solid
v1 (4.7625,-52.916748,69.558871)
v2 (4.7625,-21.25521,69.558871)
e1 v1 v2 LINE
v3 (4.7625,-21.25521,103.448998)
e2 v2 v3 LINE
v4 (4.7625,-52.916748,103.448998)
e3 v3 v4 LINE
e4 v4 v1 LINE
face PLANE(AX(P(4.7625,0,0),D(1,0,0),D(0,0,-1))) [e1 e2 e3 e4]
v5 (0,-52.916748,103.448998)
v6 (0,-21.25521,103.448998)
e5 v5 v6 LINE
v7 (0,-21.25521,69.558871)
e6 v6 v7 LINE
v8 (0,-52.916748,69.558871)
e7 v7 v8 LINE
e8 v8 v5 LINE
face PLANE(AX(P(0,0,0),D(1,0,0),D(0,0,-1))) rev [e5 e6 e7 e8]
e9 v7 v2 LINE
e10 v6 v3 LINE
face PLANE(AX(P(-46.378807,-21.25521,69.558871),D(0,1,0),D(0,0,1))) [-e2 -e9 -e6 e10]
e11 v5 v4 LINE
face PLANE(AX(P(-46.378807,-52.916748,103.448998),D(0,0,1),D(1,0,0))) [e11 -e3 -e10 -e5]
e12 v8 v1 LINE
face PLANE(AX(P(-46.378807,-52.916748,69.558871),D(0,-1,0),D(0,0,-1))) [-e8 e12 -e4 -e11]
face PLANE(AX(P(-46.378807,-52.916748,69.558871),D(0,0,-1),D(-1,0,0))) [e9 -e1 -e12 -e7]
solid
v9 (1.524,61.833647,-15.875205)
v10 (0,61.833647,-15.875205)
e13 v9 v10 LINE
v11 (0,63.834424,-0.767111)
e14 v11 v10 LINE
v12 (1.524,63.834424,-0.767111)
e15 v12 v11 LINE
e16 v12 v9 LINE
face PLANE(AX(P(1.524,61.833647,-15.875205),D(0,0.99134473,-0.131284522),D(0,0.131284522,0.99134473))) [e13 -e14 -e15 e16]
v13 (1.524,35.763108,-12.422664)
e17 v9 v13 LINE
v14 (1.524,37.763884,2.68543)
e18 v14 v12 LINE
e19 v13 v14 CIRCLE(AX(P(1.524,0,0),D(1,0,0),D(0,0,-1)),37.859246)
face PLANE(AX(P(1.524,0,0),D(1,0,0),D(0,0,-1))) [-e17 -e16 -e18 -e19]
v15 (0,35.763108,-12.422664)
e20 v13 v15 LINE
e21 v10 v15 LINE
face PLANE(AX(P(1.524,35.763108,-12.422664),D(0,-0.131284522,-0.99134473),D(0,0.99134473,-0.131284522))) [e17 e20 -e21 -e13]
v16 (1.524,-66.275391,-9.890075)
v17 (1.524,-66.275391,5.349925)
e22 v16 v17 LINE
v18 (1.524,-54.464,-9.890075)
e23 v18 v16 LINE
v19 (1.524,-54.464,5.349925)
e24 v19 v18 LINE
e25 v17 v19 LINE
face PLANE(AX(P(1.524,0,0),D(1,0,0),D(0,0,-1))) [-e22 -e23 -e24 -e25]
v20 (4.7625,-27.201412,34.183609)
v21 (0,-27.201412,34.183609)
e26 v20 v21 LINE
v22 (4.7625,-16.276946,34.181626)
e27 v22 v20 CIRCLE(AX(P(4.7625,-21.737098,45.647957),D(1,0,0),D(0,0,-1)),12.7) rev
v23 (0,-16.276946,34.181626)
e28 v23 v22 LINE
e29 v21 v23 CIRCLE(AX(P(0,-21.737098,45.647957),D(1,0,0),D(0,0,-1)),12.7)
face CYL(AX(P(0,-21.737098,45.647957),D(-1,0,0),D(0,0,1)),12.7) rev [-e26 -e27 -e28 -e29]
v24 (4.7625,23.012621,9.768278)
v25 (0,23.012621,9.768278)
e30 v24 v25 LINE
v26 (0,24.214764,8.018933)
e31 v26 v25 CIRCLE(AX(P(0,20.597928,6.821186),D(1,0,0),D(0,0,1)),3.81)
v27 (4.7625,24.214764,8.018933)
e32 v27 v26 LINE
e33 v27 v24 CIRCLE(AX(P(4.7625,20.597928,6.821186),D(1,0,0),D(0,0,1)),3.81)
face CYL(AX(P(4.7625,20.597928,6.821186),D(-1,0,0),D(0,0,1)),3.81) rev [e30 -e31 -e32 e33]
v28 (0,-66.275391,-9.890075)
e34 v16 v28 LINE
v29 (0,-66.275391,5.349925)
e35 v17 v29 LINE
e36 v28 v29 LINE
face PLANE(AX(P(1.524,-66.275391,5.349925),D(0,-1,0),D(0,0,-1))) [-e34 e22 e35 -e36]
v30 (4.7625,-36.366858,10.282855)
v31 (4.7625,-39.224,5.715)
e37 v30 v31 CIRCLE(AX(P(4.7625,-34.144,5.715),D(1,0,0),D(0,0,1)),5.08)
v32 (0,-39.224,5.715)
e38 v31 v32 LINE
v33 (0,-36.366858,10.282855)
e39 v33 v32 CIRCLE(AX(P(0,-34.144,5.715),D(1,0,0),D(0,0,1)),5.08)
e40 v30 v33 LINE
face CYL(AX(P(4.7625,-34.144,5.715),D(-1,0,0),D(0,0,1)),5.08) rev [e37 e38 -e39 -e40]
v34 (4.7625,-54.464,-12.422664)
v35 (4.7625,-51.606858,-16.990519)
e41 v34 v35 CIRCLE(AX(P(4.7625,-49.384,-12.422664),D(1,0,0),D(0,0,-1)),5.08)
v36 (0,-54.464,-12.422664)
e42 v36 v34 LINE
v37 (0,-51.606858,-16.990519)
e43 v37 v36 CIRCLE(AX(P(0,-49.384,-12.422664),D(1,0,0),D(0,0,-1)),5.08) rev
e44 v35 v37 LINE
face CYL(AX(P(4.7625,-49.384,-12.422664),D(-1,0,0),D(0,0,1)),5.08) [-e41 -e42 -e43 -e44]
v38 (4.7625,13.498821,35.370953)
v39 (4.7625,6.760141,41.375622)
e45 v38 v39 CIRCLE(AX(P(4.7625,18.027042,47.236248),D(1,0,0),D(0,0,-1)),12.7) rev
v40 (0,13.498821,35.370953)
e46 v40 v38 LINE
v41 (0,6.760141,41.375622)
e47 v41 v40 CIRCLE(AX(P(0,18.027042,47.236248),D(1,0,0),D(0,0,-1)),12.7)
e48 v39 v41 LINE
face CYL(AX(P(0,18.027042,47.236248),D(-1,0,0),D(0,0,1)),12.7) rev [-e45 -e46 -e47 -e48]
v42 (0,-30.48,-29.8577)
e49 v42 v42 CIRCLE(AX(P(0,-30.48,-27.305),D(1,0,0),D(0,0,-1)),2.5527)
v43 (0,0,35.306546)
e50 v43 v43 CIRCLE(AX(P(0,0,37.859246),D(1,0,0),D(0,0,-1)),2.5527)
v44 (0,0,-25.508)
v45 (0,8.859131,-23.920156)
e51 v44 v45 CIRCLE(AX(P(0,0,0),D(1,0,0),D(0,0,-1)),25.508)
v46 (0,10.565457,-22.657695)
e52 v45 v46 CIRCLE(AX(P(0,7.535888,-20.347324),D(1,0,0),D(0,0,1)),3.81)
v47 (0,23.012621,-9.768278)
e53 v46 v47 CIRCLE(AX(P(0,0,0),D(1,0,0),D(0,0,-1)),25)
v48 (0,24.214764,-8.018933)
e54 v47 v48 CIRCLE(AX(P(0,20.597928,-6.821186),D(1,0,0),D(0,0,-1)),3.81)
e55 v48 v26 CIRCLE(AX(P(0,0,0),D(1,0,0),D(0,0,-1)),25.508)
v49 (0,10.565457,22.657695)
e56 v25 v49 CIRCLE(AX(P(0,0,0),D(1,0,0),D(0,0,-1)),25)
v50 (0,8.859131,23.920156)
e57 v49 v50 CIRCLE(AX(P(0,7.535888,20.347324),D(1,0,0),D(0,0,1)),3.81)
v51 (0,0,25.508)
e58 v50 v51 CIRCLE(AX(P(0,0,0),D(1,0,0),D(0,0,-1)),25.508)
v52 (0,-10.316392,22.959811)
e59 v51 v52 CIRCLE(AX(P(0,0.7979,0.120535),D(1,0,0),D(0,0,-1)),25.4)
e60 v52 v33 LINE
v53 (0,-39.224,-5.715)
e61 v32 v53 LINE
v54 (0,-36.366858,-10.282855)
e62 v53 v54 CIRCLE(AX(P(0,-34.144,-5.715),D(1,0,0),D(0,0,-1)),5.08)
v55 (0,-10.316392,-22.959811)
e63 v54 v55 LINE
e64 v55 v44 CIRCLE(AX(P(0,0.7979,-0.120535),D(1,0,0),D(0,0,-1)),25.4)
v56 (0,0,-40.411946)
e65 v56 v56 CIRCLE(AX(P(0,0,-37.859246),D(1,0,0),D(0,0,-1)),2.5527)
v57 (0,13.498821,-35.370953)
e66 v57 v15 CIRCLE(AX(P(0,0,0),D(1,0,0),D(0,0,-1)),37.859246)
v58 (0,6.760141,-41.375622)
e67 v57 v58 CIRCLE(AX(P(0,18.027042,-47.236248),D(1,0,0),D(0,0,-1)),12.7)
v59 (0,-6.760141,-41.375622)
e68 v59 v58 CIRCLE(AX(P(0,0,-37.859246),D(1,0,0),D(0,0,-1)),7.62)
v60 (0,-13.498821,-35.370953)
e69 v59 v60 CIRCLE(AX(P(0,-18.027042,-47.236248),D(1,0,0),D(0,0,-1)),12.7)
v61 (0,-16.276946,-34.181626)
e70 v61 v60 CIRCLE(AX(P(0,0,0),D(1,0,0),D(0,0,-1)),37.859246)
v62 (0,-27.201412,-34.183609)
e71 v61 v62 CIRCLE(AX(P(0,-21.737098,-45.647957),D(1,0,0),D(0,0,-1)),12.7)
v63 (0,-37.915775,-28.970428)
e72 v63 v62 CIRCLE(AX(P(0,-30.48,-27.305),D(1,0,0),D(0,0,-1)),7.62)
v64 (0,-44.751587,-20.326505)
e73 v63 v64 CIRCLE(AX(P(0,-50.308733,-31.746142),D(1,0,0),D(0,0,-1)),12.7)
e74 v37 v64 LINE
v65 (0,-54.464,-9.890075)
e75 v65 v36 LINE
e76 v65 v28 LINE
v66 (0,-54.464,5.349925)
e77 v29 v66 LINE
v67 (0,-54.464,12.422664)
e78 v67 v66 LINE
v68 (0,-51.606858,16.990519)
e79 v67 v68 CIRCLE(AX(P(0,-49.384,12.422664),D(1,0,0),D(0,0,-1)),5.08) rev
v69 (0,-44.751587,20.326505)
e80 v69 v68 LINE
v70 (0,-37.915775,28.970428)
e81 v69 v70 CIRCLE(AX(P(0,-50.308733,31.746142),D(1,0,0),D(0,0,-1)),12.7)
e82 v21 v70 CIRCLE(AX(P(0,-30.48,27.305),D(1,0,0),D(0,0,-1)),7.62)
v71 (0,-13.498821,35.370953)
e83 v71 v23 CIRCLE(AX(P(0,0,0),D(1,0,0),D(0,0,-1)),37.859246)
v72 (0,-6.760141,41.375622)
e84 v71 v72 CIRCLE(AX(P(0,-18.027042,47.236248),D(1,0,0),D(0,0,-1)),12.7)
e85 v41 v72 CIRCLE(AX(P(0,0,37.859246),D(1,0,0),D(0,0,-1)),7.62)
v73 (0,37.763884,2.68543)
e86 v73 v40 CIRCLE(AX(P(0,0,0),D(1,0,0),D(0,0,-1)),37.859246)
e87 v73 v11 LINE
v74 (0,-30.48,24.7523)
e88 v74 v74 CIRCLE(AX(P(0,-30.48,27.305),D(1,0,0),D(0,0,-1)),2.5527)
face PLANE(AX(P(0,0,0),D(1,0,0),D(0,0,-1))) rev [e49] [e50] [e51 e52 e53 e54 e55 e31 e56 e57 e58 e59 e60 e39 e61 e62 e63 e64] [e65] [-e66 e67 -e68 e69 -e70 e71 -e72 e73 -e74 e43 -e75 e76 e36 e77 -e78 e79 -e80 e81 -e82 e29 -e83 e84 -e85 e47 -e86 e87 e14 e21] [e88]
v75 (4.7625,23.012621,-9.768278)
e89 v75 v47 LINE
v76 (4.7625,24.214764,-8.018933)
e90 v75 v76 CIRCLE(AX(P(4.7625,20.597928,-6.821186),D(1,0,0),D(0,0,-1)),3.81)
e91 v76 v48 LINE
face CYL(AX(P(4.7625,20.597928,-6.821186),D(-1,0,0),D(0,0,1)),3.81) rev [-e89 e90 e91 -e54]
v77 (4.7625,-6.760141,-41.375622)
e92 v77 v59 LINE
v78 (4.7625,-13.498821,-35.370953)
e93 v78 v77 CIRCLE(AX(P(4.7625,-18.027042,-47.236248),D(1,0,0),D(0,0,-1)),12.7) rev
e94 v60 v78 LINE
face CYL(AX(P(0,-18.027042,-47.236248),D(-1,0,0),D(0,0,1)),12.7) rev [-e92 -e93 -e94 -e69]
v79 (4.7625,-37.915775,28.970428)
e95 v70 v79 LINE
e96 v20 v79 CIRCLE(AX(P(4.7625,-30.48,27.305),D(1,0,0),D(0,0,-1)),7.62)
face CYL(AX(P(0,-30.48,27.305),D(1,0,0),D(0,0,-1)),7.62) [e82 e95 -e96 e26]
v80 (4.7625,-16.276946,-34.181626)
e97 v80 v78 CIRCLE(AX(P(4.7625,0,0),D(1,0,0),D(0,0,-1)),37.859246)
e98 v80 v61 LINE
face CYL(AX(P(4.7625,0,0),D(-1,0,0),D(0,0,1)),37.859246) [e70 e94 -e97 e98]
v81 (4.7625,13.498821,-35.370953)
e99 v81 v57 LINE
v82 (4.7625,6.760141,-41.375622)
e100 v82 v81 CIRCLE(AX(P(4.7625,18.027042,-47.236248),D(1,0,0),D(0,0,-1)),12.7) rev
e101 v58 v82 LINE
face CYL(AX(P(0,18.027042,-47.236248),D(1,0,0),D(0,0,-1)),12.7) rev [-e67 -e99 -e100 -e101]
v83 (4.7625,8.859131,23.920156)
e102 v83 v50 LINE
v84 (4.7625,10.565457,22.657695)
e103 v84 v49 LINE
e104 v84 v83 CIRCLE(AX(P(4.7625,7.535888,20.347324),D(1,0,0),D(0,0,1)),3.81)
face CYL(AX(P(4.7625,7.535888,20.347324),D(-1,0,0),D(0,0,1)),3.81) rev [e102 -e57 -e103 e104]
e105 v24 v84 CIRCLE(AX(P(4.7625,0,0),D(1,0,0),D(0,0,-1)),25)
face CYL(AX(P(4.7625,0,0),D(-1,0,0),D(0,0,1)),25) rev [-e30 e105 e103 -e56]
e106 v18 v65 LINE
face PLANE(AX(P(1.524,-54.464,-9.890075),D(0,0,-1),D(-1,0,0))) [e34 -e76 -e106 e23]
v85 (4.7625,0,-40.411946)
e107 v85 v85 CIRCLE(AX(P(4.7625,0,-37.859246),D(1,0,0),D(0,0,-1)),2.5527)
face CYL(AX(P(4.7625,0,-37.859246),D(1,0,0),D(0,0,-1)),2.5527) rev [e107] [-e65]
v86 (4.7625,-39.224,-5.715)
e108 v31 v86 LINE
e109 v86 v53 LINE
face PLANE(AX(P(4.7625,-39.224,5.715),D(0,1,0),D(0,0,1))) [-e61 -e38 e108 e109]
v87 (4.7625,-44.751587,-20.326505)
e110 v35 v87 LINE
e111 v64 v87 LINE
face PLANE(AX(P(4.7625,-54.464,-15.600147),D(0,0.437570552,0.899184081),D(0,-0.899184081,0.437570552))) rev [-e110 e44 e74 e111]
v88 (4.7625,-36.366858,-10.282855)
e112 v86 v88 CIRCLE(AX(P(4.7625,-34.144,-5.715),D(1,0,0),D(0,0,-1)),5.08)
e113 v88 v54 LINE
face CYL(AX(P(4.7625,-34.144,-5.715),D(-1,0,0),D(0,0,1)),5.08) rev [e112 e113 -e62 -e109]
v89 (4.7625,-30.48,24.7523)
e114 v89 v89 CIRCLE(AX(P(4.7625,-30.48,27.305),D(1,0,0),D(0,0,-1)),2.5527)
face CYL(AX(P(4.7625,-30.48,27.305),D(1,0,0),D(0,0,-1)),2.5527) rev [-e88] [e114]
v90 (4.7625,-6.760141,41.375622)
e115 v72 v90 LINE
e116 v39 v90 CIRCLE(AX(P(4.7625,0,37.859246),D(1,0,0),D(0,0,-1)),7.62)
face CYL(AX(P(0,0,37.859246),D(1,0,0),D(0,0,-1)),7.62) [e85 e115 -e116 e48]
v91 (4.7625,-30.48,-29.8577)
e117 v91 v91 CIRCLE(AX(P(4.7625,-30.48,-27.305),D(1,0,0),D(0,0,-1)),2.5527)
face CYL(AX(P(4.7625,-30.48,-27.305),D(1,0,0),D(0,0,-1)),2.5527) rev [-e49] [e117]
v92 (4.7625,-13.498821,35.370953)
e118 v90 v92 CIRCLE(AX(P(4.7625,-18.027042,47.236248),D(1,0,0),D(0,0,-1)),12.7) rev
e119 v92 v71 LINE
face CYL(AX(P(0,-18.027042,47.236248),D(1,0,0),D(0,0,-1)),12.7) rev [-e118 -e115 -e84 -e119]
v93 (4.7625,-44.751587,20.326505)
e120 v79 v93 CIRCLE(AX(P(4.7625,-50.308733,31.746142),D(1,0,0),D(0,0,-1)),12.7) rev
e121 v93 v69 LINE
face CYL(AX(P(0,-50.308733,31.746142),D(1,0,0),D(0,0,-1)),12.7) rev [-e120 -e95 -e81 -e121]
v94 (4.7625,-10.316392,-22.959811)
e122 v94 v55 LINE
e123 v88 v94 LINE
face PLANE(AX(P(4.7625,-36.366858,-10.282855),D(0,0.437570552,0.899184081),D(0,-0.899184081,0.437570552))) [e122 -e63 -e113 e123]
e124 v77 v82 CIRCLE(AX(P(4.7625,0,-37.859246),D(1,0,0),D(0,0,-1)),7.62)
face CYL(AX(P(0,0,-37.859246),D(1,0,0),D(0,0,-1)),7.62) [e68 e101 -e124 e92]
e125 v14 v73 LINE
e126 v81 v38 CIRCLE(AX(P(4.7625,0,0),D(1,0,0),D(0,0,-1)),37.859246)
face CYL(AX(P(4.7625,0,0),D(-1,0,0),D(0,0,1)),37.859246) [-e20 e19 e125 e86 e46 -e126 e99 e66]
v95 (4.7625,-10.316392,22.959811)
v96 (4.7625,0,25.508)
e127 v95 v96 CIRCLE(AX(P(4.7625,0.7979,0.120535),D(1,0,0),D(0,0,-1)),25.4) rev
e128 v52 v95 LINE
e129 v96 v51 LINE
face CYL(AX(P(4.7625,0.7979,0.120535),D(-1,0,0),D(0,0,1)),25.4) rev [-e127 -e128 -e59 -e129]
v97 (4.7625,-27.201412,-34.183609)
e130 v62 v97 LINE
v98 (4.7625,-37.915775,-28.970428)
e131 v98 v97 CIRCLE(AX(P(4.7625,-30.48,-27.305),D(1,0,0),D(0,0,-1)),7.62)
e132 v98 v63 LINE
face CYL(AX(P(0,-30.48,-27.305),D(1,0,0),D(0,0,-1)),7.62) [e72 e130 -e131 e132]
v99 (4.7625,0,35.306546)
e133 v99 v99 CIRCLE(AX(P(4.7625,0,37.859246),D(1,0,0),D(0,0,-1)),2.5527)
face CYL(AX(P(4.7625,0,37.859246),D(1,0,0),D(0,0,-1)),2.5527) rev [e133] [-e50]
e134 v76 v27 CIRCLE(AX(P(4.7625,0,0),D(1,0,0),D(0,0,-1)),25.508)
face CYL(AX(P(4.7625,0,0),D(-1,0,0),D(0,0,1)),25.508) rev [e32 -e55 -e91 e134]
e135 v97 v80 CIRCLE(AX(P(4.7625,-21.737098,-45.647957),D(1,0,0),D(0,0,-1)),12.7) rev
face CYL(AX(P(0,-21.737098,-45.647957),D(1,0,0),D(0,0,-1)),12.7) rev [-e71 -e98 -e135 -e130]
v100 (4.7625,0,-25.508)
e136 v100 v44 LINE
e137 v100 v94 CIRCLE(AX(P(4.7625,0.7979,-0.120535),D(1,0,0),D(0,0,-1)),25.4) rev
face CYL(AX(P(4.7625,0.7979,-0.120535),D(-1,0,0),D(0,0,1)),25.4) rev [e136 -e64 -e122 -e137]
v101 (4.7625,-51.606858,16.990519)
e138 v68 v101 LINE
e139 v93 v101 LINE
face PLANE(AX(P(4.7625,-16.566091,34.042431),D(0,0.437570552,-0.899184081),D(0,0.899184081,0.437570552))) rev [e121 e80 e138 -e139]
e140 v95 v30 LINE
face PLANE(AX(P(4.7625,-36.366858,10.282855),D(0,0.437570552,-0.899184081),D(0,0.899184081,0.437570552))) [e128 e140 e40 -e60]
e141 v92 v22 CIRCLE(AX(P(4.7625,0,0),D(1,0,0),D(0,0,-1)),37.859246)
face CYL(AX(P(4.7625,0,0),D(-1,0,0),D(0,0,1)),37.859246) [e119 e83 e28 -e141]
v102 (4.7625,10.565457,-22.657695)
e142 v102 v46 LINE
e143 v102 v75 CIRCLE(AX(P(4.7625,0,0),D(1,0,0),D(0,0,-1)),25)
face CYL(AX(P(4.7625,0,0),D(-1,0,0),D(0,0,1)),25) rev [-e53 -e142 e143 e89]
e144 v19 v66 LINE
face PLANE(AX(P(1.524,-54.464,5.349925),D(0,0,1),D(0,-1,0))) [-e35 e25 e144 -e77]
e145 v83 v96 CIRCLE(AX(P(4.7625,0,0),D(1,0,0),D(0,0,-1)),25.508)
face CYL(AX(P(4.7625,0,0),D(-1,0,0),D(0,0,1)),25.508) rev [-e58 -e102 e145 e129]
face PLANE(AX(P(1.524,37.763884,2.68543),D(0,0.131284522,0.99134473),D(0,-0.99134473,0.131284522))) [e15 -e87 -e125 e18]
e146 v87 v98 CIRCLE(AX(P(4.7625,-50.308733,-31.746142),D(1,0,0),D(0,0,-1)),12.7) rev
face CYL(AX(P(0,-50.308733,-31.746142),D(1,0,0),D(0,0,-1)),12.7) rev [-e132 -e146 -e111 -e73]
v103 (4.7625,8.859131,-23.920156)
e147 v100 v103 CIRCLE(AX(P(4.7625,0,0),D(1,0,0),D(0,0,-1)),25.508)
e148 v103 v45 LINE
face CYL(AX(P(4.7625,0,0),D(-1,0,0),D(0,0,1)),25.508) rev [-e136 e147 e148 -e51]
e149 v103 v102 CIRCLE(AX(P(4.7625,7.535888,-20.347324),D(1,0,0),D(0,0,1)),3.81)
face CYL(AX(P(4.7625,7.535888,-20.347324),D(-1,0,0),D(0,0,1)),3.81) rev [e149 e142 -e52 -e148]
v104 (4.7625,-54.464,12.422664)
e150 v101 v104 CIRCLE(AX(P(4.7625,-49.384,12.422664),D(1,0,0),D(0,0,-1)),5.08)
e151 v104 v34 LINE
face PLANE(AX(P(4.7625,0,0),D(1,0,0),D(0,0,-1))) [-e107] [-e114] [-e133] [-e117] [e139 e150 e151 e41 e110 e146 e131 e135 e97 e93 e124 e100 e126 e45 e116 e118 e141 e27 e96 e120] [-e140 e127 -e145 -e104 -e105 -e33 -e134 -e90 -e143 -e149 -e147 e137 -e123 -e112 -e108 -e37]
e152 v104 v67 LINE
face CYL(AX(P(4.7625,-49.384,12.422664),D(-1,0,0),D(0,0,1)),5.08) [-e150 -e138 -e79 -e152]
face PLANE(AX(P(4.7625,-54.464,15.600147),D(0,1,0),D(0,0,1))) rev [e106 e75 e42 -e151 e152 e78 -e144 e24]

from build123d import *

# Parameters (mm, degrees)
BOSS_EXTRUDE1_DEPTH    = 4.7625
FILLET1_R              = 25.4
FILLET2_R              = 5.08
SKETCH2_R              = 7.62
BOSS_EXTRUDE2_DEPTH    = 4.7625
FILLET3_R              = 12.7
F_10_CLEARANCE_HOLE1_D = 5.1054
SKETCH6_W              = 33.890127471
SKETCH6_H              = 31.661537848
BOSS_EXTRUDE3_DEPTH    = 4.7625
SKETCH7_W              = 15.24
SKETCH7_H              = 11.811391345
BOSS_EXTRUDE4_DEPTH    = 1.524


with BuildPart() as part:
    # Sketch1 → Boss-Extrude1 (new body)
    with BuildSketch(Plane(origin=(0, 0, 0), x_dir=(0, 0, -1), z_dir=(1, 0, 0))):
        with BuildLine():
            Line((-15.600146512, -54.464), (15.600146512, -54.464))
            Line((15.600146512, -54.464), (34.042431289, -16.566091146))
            ThreePointArc((34.042431289, -16.566091146), (0, 37.85924595), (-34.042431289, -16.566091146))
            Line((-34.042431289, -16.566091146), (-15.600146512, -54.464))
        make_face()
        with BuildLine():
            Line((25.508, 0), (25.508, -5.08))
            Line((25.508, -5.08), (10.282855133, -36.366858404))
            ThreePointArc((10.282855133, -36.366858404), (8.408907878, -38.450885226), (5.715, -39.224))
            Line((5.715, -39.224), (-5.715, -39.224))
            ThreePointArc((-5.715, -39.224), (-8.408907878, -38.450885226), (-10.282855133, -36.366858404))
            Line((-10.282855133, -36.366858404), (-25.508, -5.08))
            Line((-25.508, -5.08), (-25.508, 0))
            ThreePointArc((-25.508, 0), (-25.107901196, 4.500151281), (-23.920156064, 8.859130762))
            ThreePointArc((-23.920156064, 8.859130762), (-23.410150406, 9.801984571), (-22.657694676, 10.565456544))
            ThreePointArc((-22.657694676, 10.565456544), (-17.366459261, 17.983495008), (-9.768278212, 23.012621336))
            ThreePointArc((-9.768278212, 23.012621336), (-8.979011, 23.737973903), (-8.018932611, 24.214763756))
            ThreePointArc((-8.018932611, 24.214763756), (0, 25.508), (8.018932611, 24.214763756))
            ThreePointArc((8.018932611, 24.214763756), (8.979011, 23.737973903), (9.768278212, 23.012621336))
            ThreePointArc((9.768278212, 23.012621336), (17.366459261, 17.983495008), (22.657694676, 10.565456544))
            ThreePointArc((22.657694676, 10.565456544), (23.410150406, 9.801984571), (23.920156064, 8.859130762))
            ThreePointArc((23.920156064, 8.859130762), (25.107901196, 4.500151281), (25.508, 0))
        make_face(mode=Mode.SUBTRACT)
    extrude(amount=BOSS_EXTRUDE1_DEPTH)

    # Fillet1
    # the kernel refuses this fillet: 25.4 mm, written as the material it adds along each edge
    with BuildSketch(Plane(origin=(0, -5.08, 25.508), x_dir=(0, -0.8991840813100413, -0.43757055193261923), z_dir=(1, 0, 0))) as fillet1_piece_1:
        with BuildLine():
            CenterArc((5.823492587, 25.4), FILLET1_R, 245.851175762, 24.148824238)
            Line((-4.567855133, 2.222858404), (-4.775682087, 1.759315572))
            ThreePointArc((-4.775682087, 1.759315572), (-2.506213407, 0.654643689), (-0.22228584, -0.456785513))
            Line((-0.22228584, -0.456785513), (0, -0.508))
            Line((0, -0.508), (5.823492587, -0.508))
            Line((5.823492587, -0.508), (5.823492587, 0))
        make_face()
    extrude(amount=4.7625)
    with BuildSketch(Plane(origin=(0, -5.08, -25.508), x_dir=(0, 1, 0), z_dir=(1, 0, 0))) as fillet1_piece_2:
        with BuildLine():
            CenterArc((5.877900188, 25.387464531), FILLET1_R, 244.051024762, 24.148824238)
            Line((-5.236391831, 2.548188865), (-5.458677672, 2.091403352))
            Line((-5.458677672, 2.091403352), (-0.22228584, -0.456785513))
            Line((-0.22228584, -0.456785513), (0, -0.508))
            ThreePointArc((0, -0.508), (2.54, -0.508), (5.064041996, -0.507749291))
            Line((5.064041996, -0.507749291), (5.08, 0))
        make_face()
    extrude(amount=4.7625)

    # Fillet2
    fillet2_edges = [part.edges().sort_by_distance(p)[0] for p in [
        (2.38125, -54.464, -15.600146512),
        (2.38125, -54.464, 15.600146512),
    ]]
    fillet(fillet2_edges, radius=FILLET2_R)

    # Sketch2 → Boss-Extrude2 (add, through all)
    with BuildSketch(Plane(origin=(4.7625, 0, 0), x_dir=(0, 0, -1), z_dir=(1, 0, 0))):
        with Locations((37.85924595, 0)):
            Circle(SKETCH2_R)
        with Locations((-37.85924595, 0)):
            Circle(SKETCH2_R)
        with Locations((-27.305, -30.48)):
            Circle(SKETCH2_R)
        with Locations((27.305, -30.48)):
            Circle(SKETCH2_R)
    extrude(amount=-BOSS_EXTRUDE2_DEPTH)

    # Fillet3
    fillet3_edges = [part.edges().sort_by_distance(p)[0] for p in [
        (2.38125, -7.581315695, -37.092400249),
        (2.38125, 7.581315695, -37.092400249),
        (2.38125, 7.581315695, 37.092400249),
        (2.38125, -7.581315695, 37.092400249),
        (2.38125, -37.318546983, -23.943649801),
        (2.38125, -23.61508868, -30.612172896),
        (2.38125, -23.61508868, 30.612172896),
        (2.38125, -37.318546983, 23.943649801),
    ]]
    fillet(fillet3_edges, radius=FILLET3_R)

    # #10 Clearance Hole1 (through all)
    with Locations(Plane(origin=(4.7625, 0, 0), x_dir=(0, 0, -1), z_dir=(1, 0, 0))):
        with Locations((-37.85924595, 0), (37.85924595, 0), (27.305, -30.48), (-27.305, -30.48)):
            Hole(F_10_CLEARANCE_HOLE1_D / 2)

    # Sketch7 → Boss-Extrude4 (add)
    with BuildSketch(Plane.ZY):
        with Locations((-2.270075224, -60.369695673)):
            Rectangle(SKETCH7_W, SKETCH7_H)
        Polygon((-12.422664108, 35.763108371), (2.685429581, 37.763884491), (-0.767111353, 63.83442351), (-15.875205043, 61.83364739), align=None)
    extrude(amount=-BOSS_EXTRUDE4_DEPTH)


with BuildPart() as body_2:
    # Sketch6 → Boss-Extrude3 (new body)
    with BuildSketch(Plane(origin=(4.7625, 0, 0), x_dir=(0, 0, -1), z_dir=(1, 0, 0))):
        with Locations((-86.503934592, -37.085978952)):
            Rectangle(SKETCH6_W, SKETCH6_H)
    extrude(amount=-BOSS_EXTRUDE3_DEPTH)


solid = Compound([part.part, body_2.part])
